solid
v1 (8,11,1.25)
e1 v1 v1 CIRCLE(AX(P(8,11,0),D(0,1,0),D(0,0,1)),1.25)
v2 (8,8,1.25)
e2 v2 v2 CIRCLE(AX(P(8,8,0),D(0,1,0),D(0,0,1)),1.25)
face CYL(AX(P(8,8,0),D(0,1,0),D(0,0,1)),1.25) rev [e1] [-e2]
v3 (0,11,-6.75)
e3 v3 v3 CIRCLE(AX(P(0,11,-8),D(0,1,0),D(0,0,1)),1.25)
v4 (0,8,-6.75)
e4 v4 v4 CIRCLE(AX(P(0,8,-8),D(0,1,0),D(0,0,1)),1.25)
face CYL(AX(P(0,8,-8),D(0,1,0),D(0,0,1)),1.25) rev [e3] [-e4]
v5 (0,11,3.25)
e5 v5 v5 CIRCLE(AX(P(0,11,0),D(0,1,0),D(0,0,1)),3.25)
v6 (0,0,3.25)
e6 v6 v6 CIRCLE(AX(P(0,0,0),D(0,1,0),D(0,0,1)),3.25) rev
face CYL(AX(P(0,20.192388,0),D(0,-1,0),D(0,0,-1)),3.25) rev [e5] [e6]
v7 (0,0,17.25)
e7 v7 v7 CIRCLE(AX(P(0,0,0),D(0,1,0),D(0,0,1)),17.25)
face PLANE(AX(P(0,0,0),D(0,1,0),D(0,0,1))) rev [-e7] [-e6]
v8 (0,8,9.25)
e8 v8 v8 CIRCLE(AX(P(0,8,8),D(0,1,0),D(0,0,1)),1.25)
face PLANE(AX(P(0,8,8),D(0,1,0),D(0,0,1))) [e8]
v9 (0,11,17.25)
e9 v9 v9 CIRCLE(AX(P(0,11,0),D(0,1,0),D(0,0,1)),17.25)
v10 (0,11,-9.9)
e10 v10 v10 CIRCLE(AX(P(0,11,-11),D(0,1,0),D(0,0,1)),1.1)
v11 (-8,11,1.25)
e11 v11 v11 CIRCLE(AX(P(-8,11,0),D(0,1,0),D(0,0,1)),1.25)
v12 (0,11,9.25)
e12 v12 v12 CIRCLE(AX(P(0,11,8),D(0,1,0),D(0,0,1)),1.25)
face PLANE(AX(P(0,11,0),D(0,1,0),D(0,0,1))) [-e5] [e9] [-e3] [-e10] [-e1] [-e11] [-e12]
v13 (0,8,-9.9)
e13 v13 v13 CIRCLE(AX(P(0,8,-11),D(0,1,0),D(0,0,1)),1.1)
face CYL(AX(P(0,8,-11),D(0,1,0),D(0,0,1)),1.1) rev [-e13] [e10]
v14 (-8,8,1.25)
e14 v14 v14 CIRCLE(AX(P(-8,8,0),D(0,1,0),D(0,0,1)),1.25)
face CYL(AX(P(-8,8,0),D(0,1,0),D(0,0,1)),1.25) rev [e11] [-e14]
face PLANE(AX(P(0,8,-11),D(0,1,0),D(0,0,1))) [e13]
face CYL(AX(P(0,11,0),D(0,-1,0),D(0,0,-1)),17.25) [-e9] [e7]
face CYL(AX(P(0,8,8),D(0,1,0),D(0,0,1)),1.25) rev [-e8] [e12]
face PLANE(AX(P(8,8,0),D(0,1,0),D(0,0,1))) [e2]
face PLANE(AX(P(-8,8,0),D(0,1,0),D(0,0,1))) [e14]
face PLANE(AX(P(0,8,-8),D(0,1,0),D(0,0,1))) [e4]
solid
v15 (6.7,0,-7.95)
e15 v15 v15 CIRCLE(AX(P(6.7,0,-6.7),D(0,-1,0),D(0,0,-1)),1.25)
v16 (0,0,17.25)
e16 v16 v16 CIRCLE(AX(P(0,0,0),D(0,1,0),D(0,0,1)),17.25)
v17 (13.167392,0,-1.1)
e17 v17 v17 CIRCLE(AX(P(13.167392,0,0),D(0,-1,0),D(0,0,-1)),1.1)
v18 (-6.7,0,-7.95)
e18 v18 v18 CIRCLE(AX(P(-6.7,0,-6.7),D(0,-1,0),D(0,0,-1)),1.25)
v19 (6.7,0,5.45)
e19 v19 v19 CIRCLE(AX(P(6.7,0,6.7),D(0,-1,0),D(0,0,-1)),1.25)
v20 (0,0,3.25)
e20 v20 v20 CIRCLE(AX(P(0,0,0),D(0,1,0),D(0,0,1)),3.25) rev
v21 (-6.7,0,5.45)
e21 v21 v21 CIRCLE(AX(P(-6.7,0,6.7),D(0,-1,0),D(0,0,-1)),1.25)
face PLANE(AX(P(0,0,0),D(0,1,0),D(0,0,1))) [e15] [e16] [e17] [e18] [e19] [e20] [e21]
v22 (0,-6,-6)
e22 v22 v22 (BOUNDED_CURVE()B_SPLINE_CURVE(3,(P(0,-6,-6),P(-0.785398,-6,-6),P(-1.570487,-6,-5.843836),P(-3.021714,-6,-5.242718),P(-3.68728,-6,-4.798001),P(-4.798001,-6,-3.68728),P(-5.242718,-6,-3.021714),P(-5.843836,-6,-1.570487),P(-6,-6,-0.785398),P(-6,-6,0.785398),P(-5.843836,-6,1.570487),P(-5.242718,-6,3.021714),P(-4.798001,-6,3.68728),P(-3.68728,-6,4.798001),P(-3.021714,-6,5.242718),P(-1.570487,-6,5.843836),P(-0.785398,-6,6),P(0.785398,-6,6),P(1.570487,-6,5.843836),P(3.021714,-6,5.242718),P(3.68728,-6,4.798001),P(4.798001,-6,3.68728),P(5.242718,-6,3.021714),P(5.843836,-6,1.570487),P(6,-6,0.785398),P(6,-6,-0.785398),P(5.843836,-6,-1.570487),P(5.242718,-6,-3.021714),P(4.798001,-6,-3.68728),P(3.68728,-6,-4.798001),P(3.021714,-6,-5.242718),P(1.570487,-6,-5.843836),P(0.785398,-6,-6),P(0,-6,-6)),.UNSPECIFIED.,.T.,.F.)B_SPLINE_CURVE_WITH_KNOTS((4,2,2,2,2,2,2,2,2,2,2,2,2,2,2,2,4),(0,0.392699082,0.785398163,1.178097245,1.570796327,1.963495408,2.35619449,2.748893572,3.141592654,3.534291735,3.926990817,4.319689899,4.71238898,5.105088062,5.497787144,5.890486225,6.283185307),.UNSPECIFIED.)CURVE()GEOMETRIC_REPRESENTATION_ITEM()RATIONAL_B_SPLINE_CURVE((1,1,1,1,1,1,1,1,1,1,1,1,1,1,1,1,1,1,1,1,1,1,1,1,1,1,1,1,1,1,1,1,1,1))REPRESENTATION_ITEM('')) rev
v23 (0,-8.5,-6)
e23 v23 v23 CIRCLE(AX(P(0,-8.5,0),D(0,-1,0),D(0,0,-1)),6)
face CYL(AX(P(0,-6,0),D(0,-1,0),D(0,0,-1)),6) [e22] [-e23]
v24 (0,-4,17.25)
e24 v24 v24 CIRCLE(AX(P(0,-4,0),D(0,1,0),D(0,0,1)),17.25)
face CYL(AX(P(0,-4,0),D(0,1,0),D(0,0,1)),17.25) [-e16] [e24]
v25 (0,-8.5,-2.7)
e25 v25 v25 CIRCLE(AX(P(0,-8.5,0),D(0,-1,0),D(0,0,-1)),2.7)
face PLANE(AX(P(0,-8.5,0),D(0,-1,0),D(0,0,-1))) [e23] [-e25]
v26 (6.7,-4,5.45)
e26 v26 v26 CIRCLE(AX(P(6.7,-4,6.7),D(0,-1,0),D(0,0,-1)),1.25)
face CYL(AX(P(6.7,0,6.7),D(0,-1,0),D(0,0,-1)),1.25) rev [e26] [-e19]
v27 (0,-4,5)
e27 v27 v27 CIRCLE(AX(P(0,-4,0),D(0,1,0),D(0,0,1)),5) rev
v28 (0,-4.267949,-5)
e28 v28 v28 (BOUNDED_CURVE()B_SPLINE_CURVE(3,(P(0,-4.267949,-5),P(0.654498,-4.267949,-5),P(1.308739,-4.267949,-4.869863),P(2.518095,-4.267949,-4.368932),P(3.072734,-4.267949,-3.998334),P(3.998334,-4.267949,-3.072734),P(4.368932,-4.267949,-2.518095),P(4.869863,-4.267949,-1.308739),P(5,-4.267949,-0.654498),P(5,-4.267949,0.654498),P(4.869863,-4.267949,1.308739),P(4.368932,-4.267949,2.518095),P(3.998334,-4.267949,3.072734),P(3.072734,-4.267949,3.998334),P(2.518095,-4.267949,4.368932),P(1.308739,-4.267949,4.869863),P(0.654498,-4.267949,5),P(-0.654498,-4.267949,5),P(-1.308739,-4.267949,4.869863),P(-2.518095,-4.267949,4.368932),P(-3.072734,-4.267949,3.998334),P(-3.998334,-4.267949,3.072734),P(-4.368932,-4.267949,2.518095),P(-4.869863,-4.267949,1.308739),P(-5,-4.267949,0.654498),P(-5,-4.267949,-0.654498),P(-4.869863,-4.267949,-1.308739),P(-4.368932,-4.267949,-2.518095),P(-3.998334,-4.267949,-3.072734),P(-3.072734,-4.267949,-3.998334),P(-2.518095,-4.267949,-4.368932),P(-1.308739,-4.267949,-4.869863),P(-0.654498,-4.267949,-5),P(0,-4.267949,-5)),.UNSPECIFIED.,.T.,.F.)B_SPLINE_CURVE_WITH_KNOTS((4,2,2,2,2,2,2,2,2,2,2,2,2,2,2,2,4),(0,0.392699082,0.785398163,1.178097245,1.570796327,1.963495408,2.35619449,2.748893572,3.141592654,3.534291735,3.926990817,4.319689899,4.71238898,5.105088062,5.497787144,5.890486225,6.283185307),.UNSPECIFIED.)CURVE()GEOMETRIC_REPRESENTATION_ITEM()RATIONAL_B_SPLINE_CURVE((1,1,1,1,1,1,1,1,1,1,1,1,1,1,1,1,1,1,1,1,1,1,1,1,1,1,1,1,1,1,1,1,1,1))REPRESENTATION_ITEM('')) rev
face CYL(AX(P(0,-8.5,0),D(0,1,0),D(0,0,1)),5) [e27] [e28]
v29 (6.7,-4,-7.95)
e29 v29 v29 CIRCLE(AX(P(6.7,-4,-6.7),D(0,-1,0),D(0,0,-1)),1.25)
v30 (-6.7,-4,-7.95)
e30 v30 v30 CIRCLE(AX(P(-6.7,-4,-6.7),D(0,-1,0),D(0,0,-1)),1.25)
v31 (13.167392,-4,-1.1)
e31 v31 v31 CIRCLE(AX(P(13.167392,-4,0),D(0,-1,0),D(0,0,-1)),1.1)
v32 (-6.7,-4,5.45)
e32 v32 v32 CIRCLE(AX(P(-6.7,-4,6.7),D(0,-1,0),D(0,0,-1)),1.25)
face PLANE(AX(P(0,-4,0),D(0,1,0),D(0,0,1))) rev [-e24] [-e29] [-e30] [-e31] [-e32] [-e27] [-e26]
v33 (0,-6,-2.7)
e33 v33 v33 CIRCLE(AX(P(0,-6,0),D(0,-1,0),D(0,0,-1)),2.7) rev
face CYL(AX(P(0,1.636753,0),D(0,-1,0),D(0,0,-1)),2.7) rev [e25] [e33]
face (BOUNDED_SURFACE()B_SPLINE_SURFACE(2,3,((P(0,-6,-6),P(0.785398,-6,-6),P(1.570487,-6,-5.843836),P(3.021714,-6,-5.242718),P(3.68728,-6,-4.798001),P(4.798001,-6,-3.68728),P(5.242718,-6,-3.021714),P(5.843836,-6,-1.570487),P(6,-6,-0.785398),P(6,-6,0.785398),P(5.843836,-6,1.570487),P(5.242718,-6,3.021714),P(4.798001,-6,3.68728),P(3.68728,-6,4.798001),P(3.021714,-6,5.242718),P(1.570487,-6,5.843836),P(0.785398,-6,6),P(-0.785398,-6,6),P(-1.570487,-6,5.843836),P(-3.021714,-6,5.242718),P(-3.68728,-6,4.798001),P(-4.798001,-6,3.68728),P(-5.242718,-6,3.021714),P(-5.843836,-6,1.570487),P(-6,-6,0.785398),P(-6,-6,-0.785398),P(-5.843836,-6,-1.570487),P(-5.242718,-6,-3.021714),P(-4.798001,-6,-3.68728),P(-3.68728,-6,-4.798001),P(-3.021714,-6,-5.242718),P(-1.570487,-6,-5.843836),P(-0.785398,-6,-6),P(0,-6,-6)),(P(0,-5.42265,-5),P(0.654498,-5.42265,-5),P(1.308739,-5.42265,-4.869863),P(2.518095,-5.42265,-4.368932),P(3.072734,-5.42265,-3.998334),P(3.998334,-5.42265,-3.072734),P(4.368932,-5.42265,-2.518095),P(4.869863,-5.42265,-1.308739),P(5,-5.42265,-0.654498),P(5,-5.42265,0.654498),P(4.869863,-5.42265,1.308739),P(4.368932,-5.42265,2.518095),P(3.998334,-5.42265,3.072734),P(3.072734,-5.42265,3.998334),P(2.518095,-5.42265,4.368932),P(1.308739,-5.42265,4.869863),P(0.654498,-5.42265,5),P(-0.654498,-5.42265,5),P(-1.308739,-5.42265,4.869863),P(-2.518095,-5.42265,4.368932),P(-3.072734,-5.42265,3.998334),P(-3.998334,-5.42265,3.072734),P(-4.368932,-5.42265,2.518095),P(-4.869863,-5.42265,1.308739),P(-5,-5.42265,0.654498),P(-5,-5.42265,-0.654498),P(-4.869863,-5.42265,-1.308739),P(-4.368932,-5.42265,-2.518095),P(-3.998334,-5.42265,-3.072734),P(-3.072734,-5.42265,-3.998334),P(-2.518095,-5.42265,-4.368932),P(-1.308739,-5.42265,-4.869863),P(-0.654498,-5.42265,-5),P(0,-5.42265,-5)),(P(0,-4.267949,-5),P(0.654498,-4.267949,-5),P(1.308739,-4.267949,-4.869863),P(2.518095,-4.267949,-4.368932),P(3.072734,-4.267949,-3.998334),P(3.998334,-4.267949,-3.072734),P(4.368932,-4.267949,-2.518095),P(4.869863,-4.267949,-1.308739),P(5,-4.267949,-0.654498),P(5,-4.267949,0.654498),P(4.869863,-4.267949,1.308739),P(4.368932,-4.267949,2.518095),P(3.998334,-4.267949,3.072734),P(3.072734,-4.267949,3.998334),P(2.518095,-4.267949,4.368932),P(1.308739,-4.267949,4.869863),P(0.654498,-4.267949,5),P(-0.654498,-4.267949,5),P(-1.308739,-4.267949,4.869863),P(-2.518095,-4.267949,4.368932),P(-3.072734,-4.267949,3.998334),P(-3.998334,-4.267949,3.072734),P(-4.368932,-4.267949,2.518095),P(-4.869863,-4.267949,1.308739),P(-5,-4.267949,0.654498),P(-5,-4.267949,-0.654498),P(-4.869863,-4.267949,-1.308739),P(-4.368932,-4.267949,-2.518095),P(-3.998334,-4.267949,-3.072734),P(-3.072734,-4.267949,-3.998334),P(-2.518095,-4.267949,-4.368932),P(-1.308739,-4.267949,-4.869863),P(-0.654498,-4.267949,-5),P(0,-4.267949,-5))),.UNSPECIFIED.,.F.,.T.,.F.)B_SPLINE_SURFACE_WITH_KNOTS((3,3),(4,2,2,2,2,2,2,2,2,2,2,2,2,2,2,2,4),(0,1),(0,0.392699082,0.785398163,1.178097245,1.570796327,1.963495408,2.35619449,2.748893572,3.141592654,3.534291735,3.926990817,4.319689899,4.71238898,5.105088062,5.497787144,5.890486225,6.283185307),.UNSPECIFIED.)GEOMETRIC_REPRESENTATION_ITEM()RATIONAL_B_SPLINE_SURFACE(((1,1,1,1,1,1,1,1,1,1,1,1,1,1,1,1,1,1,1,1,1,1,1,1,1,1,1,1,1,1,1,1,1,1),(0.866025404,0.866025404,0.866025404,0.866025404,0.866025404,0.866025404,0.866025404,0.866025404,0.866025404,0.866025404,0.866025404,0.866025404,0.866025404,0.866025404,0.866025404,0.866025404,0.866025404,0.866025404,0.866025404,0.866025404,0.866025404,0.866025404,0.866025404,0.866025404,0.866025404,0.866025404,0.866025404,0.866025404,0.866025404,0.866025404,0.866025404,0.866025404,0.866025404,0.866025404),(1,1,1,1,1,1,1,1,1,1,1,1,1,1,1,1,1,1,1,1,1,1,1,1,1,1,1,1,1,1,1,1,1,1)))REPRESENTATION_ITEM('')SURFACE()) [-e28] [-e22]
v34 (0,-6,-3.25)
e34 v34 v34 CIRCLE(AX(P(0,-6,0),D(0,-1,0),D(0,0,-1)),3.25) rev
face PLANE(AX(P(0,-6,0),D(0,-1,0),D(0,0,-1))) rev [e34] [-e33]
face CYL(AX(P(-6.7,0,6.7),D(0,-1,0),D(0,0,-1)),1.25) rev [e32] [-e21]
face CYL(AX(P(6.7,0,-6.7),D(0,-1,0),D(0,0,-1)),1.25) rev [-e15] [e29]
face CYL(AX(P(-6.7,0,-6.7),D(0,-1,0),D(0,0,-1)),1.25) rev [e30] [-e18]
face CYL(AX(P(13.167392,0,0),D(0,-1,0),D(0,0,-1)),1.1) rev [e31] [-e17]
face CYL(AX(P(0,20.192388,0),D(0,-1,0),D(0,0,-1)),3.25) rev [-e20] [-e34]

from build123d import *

# Parameters (mm, degrees)
SKETCH1_R           = 17.25
BOSS_EXTRUDE1_DEPTH = 11
SKETCH2_R           = 1.25
SKETCH2_R_2         = 1.1
CUT_EXTRUDE1_DEPTH  = 3
SKETCH1_2_R         = 17.25
BOSS_EXTRUDE2_DEPTH = 4
SKETCH4_R           = 1.25
SKETCH4_R_2         = 1.1
CUT_EXTRUDE3_DEPTH  = 4
SKETCH5_R           = 5
BOSS_EXTRUDE3_DEPTH = 4.5
BOSS_EXTRUDE4_START = 4.5
SKETCH5_3_R         = 6
SKETCH5_3_R_2       = 5
BOSS_EXTRUDE4_DEPTH = 2.5
CUT_EXTRUDE4_START  = 4.5
SKETCH5_5_R         = 2.7
CUT_EXTRUDE4_DEPTH  = 2.5
CUT_EXTRUDE5_START  = -6
SKETCH6_R           = 3.25
CUT_EXTRUDE5_DEPTH  = 17
FILLET1_R           = 2


with BuildPart() as part:
    # Sketch1 → Boss-Extrude1 (new body)
    with BuildSketch(Plane(origin=(0, 0, 0), x_dir=(1, 0, 0), z_dir=(0, 1, 0))):
        with Locations(Location((0, 0, 0), (0, 0, 270))):
            Circle(SKETCH1_R)
    extrude(amount=BOSS_EXTRUDE1_DEPTH)

    # Sketch2 → Cut-Extrude1 (cut)
    with BuildSketch(Plane(origin=(0, 11, 0), x_dir=(1, 0, 0), z_dir=(0, 1, 0))):
        with Locations(Location((0, 8, 0), (0, 0, 270))):
            Circle(SKETCH2_R)
        with Locations(Location((0, 11, 0), (0, 0, 270))):
            Circle(SKETCH2_R_2)
        with Locations(Location((8, 0, 0), (0, 0, 270))):
            Circle(SKETCH2_R)
        with Locations(Location((0, -8, 0), (0, 0, 270))):
            Circle(SKETCH2_R)
        with Locations(Location((-8, 0, 0), (0, 0, 270))):
            Circle(SKETCH2_R)
    extrude(amount=-CUT_EXTRUDE1_DEPTH, mode=Mode.SUBTRACT)


with BuildPart() as body_2:
    # Sketch1<2> → Boss-Extrude2 (new body)
    with BuildSketch(Plane(origin=(0, 0, 0), x_dir=(1, 0, 0), z_dir=(0, 1, 0))):
        with Locations(Location((0, 0, 0), (0, 0, 270))):
            Circle(SKETCH1_2_R)
    extrude(amount=-BOSS_EXTRUDE2_DEPTH)

    # Sketch4 → Cut-Extrude3 (cut)
    with BuildSketch(Plane.XZ.offset(4)):
        with Locations(Location((-6.7, 6.7, 0), (0, 0, 270))):
            Circle(SKETCH4_R)
        with Locations(Location((6.7, 6.7, 0), (0, 0, 270))):
            Circle(SKETCH4_R)
        with Locations(Location((6.7, -6.7, 0), (0, 0, 270))):
            Circle(SKETCH4_R)
        with Locations(Location((-6.7, -6.7, 0), (0, 0, 270))):
            Circle(SKETCH4_R)
        with Locations(Location((13.167391572, 0, 0), (0, 0, 270))):
            Circle(SKETCH4_R_2)
    extrude(amount=-CUT_EXTRUDE3_DEPTH, mode=Mode.SUBTRACT)

    # Sketch5 → Boss-Extrude3 (add)
    with BuildSketch(Plane.XZ.offset(4)):
        with Locations(Location((0, 0, 0), (0, 0, 90))):
            Circle(SKETCH5_R)
    extrude(amount=BOSS_EXTRUDE3_DEPTH)

    # Sketch5<3> → Boss-Extrude4 (add)
    with BuildSketch(Plane.XZ.offset(4).offset(BOSS_EXTRUDE4_START)):
        with Locations(Location((0, 0, 0), (0, 0, 270))):
            Circle(SKETCH5_3_R)
        with Locations(Location((0, 0, 0), (0, 0, 90))):
            Circle(SKETCH5_3_R_2, mode=Mode.SUBTRACT)
    extrude(amount=-BOSS_EXTRUDE4_DEPTH)

    # Sketch5<5> → Cut-Extrude4 (cut)
    with BuildSketch(Plane.XZ.offset(4).offset(CUT_EXTRUDE4_START)):
        with Locations(Location((0, 0, 0), (0, 0, 270))):
            Circle(SKETCH5_5_R)
    extrude(amount=-CUT_EXTRUDE4_DEPTH, mode=Mode.SUBTRACT)


with BuildPart() as cut_extrude5_tool:
    # Sketch6 → Cut-Extrude5 (new body)
    with BuildSketch(Plane(origin=(0, 0, 0), x_dir=(1, 0, 0), z_dir=(0, 1, 0)).offset(CUT_EXTRUDE5_START)):
        with Locations(Location((0, 0, 0), (0, 0, 90))):
            Circle(SKETCH6_R)
    extrude(amount=CUT_EXTRUDE5_DEPTH)


with BuildPart() as part_1:
    add(part.part)

    # Cut-Extrude5: cut by cut_extrude5_tool
    add(cut_extrude5_tool.part, mode=Mode.SUBTRACT)


with BuildPart() as body_2_1:
    add(body_2.part)

    # Cut-Extrude5: cut by cut_extrude5_tool
    add(cut_extrude5_tool.part, mode=Mode.SUBTRACT)

    # Fillet1
    # the kernel refuses this fillet: 2 mm, written as the material it adds along each edge
    with BuildSketch(Plane(origin=(0, -6, 0), x_dir=(0, 0, 1), z_dir=(1, 0, 0))) as fillet1_piece_1:
        with BuildLine():
            CenterArc((7, -1.732050808), FILLET1_R, 120, 60)
            Line((6, 0), (5.98, 0.034641016))
            ThreePointArc((5.98, 0.034641016), (5.5, 0.04), (5, 0.04))
            Line((5, 0.04), (4.96, 0))
            Line((4.96, 0), (4.96, -1.732050808))
            Line((4.96, -1.732050808), (5, -1.732050808))
        make_face()
    revolve(axis=Axis((0, -6, 0), (0, -1, 0)))


solid = Compound([part_1.part, body_2_1.part])
